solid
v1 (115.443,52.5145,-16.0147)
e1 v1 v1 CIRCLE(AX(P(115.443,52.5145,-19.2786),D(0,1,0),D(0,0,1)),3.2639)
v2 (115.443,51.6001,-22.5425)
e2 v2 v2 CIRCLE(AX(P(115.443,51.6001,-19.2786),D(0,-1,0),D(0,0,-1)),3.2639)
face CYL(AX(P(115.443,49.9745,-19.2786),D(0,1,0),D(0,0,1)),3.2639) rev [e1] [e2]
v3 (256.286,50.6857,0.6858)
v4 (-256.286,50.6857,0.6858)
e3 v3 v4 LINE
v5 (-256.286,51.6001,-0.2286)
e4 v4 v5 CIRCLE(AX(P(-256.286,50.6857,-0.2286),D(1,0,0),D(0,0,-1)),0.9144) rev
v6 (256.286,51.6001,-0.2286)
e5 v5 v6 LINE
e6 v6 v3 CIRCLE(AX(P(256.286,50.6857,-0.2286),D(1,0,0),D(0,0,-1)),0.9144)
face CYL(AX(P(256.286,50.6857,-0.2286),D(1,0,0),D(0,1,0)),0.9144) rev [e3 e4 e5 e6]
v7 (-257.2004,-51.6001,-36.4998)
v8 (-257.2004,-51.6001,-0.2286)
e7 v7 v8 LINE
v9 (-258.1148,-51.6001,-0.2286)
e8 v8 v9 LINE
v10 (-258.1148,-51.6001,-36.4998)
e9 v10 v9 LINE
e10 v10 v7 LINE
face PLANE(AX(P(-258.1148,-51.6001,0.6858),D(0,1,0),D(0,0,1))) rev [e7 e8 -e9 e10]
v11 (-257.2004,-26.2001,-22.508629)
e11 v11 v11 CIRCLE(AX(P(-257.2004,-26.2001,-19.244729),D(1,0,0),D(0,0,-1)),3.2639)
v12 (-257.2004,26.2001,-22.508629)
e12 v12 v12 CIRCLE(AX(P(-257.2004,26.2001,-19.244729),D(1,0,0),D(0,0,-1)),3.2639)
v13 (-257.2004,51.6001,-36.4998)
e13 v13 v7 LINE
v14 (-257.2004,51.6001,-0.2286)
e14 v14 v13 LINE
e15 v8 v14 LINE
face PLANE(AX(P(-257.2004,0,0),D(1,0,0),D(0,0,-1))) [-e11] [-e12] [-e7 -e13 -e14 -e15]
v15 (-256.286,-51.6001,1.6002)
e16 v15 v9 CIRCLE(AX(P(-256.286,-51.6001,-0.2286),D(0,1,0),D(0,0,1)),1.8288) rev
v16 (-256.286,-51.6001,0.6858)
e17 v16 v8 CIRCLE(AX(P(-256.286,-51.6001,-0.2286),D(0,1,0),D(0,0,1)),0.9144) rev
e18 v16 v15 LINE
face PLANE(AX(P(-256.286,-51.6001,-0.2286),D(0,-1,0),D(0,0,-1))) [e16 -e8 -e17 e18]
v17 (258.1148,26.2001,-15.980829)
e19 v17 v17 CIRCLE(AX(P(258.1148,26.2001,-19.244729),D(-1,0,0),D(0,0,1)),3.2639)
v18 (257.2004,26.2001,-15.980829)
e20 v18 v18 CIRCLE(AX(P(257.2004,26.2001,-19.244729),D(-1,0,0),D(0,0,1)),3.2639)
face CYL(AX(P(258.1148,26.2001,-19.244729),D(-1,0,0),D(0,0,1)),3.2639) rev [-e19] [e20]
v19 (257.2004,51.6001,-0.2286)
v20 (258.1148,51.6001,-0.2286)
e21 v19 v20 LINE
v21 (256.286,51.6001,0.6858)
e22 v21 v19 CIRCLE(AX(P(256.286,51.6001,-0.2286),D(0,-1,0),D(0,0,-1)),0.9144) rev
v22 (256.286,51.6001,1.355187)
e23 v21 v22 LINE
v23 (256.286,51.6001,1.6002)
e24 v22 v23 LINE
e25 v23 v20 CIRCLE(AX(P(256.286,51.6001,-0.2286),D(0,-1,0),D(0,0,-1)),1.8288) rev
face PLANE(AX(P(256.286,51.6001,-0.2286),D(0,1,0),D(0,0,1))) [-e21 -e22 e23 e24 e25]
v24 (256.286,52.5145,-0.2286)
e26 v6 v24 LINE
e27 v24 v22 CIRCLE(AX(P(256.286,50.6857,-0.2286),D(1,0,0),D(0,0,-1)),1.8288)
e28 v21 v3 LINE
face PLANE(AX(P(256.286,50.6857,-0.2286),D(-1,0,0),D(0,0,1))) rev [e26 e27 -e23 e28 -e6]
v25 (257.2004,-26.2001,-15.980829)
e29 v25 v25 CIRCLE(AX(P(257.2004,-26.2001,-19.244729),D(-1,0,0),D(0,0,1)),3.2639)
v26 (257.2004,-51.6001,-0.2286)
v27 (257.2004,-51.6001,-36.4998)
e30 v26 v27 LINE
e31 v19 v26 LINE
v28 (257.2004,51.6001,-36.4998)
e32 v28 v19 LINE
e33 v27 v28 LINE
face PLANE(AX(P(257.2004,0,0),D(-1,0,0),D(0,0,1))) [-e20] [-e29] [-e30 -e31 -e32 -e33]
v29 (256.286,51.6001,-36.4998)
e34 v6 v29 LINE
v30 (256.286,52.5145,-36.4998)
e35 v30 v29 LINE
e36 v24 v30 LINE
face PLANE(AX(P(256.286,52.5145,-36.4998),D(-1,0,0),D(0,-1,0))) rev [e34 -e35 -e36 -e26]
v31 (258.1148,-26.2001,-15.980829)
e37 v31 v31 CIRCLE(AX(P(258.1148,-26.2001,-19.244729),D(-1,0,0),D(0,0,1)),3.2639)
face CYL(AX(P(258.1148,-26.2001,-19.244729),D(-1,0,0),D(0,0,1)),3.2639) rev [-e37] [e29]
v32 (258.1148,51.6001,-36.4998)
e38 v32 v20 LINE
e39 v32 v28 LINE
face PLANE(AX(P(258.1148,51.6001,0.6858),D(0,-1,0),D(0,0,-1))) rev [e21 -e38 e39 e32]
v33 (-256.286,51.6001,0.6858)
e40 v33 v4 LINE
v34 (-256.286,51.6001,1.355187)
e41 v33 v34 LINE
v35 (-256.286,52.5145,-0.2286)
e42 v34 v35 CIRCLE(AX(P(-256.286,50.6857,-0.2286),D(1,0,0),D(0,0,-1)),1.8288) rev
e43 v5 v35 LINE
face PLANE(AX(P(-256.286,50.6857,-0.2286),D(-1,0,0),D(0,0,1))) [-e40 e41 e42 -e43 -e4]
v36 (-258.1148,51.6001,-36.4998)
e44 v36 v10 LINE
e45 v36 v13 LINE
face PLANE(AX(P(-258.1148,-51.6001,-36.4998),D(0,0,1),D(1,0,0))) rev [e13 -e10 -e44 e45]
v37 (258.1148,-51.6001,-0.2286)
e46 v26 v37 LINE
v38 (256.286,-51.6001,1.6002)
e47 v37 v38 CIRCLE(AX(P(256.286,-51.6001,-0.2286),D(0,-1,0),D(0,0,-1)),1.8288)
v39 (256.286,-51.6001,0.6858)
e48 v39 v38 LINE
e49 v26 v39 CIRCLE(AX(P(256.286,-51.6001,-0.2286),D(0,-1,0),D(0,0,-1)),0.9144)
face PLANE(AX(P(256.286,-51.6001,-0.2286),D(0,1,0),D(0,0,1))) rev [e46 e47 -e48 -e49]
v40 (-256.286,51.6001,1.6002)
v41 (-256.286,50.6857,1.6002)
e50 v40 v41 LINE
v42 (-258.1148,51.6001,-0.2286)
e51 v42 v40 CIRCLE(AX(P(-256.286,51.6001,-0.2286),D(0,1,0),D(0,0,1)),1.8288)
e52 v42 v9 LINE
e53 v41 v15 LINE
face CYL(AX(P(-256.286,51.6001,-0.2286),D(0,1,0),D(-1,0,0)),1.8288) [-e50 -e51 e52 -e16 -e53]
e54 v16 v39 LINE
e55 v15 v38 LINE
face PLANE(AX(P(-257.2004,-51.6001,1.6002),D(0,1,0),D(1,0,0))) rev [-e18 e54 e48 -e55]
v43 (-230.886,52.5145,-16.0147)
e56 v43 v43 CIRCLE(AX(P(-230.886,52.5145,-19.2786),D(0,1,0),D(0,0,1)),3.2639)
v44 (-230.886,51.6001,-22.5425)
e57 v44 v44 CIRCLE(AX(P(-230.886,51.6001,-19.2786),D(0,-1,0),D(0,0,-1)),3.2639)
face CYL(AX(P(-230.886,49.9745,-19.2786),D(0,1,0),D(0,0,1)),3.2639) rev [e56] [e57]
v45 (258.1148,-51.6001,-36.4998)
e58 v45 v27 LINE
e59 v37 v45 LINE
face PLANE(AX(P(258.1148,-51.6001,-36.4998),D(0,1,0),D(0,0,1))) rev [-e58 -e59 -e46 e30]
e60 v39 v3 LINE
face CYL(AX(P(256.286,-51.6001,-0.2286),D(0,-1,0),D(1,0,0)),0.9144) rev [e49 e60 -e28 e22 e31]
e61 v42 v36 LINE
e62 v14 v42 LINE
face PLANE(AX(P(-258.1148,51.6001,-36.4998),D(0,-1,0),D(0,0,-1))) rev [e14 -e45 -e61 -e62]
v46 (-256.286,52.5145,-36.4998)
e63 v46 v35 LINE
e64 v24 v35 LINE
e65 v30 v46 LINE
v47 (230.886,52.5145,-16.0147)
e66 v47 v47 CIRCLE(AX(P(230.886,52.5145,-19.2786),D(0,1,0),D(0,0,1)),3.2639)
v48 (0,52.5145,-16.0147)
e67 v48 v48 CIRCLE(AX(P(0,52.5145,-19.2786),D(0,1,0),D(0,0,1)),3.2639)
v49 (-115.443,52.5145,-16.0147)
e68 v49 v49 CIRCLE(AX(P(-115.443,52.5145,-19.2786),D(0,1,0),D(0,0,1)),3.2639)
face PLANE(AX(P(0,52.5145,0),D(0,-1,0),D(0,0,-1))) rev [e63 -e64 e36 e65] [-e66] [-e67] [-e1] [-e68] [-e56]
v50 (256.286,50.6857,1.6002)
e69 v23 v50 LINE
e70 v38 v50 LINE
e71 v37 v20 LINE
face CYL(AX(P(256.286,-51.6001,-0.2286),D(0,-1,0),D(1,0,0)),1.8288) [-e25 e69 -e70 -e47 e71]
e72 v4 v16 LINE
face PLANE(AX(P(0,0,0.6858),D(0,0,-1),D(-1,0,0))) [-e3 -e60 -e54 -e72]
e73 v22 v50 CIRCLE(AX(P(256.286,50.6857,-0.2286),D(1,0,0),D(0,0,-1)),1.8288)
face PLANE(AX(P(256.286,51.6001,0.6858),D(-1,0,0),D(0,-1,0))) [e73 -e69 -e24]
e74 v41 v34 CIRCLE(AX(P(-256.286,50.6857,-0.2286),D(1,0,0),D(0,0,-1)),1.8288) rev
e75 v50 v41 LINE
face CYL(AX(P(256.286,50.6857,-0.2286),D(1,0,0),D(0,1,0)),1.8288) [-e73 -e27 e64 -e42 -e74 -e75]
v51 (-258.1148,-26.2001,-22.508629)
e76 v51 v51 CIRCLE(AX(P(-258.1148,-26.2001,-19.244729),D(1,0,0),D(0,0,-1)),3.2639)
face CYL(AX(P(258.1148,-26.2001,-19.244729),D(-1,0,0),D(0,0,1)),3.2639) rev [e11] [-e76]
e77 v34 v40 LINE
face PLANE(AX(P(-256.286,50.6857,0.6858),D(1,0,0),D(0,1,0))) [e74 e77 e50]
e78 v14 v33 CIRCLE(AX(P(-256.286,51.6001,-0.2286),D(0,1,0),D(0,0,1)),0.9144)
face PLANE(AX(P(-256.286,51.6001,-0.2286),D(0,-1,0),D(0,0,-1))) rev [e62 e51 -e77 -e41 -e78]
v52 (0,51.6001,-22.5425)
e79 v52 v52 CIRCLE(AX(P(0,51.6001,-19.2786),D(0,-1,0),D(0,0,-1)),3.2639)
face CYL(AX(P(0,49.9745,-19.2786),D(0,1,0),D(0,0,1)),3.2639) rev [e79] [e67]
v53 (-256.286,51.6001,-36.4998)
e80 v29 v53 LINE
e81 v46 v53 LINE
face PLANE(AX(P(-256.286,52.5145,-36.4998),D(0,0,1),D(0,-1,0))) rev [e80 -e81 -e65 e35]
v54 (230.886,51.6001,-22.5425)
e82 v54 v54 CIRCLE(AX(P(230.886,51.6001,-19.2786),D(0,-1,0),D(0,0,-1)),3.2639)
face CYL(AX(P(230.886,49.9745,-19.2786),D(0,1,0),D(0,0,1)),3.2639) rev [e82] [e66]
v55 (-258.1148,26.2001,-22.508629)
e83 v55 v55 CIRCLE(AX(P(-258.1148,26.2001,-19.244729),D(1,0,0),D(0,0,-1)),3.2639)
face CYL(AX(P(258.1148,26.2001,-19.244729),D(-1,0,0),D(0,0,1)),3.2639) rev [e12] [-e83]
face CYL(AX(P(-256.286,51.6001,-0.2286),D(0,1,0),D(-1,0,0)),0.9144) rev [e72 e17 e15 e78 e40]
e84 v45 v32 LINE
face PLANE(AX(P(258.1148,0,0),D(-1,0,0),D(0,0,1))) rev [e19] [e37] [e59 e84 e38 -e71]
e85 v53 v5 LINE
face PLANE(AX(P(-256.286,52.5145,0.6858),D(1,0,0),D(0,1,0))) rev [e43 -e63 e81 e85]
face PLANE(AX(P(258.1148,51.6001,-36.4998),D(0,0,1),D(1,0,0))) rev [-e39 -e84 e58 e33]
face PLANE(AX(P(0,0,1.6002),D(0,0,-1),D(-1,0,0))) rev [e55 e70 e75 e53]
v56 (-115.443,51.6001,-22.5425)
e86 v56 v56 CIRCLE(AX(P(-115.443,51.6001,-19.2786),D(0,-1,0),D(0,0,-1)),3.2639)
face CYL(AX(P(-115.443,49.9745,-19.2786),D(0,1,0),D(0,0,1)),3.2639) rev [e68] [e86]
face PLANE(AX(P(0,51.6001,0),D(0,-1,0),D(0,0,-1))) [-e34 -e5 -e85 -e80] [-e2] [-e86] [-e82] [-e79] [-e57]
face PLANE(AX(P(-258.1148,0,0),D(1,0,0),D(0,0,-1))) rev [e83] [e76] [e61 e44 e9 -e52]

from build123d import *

# Parameters (mm, degrees)
SKETCH1_W                    = 514.4008
SKETCH1_H                    = 103.2002
BOSS_EXTRUDE1_DEPTH          = 1.6002
CONVERT_SOLID1_OUTLINE_W     = 514.4008
CONVERT_SOLID1_OUTLINE_H     = 103.2002
CONVERT_SOLID1_DEPTH         = 0.6858
EDGE_FLANGE1_STRIP_W         = 5.4864
EDGE_FLANGE1_STRIP_H         = 0.9144
EDGE_FLANGE1_STRIP_CUT_DEPTH = 103.2002
EDGE_FLANGE1_DEPTH           = 103.2002
EDGE_FLANGE2_STRIP_W         = 5.4864
EDGE_FLANGE2_STRIP_H         = 0.9144
EDGE_FLANGE2_STRIP_CUT_DEPTH = 103.2002
EDGE_FLANGE2_DEPTH           = 103.2002
CUT_EXTRUDE3_DEPTH           = 521.084421643
CUT_EXTRUDE3_DEPTH_BACK      = 521.084421643
SKETCH18_R                   = 3.2639
EDGE_FLANGE3_STRIP_W         = 5.4864
EDGE_FLANGE3_STRIP_H         = 0.9144
EDGE_FLANGE3_STRIP_CUT_DEPTH = 512.572
EDGE_FLANGE3_DEPTH           = 512.572
SKETCH22_R                   = 3.2639
CUT_EXTRUDE4_DEPTH           = 2.54


# Read off the part's stored shape, not the designer's step: Convert-Solid1
# Sheet-metal steps are written as plain solids
with BuildPart() as part:
    # Sketch1 → Boss-Extrude1 (new body)
    with BuildSketch(Plane.XY):
        Rectangle(SKETCH1_W, SKETCH1_H)
    extrude(amount=BOSS_EXTRUDE1_DEPTH)

    # Convert-Solid1 outline → Convert-Solid1 (cut)
    with BuildSketch(Plane.XY):
        Rectangle(CONVERT_SOLID1_OUTLINE_W, CONVERT_SOLID1_OUTLINE_H)
    extrude(amount=CONVERT_SOLID1_DEPTH, mode=Mode.SUBTRACT)

    # Edge-Flange1 strip (across the edge) → Edge-Flange1 strip cut (cut)
    with BuildSketch(Plane(origin=(257.2004, 51.6001, 0.6858), x_dir=(-1, 0, 0), z_dir=(0, -1, 0))):
        with Locations((-1.8288, -0.4572)):
            Rectangle(EDGE_FLANGE1_STRIP_W, EDGE_FLANGE1_STRIP_H)
    extrude(amount=EDGE_FLANGE1_STRIP_CUT_DEPTH, mode=Mode.SUBTRACT)

    # Edge-Flange1 section (across the edge) → Edge-Flange1 (add)
    with BuildSketch(Plane(origin=(257.2004, 51.6001, 0.6858), x_dir=(-1, 0, 0), z_dir=(0, -1, 0))):
        with BuildLine():
            Line((-0.9144, 0.9144), (-0.9144, 37.1856))
            Line((-0.9144, 37.1856), (0, 37.1856))
            Line((0, 37.1856), (0, 0.9144))
            ThreePointArc((0, 0.9144), (0.267821559, 0.267821559), (0.9144, 0))
            Line((0.9144, 0), (0.9144, -0.9144))
            ThreePointArc((0.9144, -0.9144), (-0.378756881, -0.378756881), (-0.9144, 0.9144))
        make_face()
    extrude(amount=EDGE_FLANGE1_DEPTH)

    # Edge-Flange2 strip (across the edge) → Edge-Flange2 strip cut (cut)
    with BuildSketch(Plane(origin=(-257.2004, -51.6001, 0.6858), x_dir=(1, 0, 0), z_dir=(0, 1, 0))):
        with Locations((-1.8288, -0.4572)):
            Rectangle(EDGE_FLANGE2_STRIP_W, EDGE_FLANGE2_STRIP_H)
    extrude(amount=EDGE_FLANGE2_STRIP_CUT_DEPTH, mode=Mode.SUBTRACT)

    # Edge-Flange2 section (across the edge) → Edge-Flange2 (add)
    with BuildSketch(Plane(origin=(-257.2004, -51.6001, 0.6858), x_dir=(1, 0, 0), z_dir=(0, 1, 0))):
        with BuildLine():
            Line((-0.9144, 0.9144), (-0.9144, 37.1856))
            Line((-0.9144, 37.1856), (0, 37.1856))
            Line((0, 37.1856), (0, 0.9144))
            ThreePointArc((0, 0.9144), (0.267821559, 0.267821559), (0.9144, 0))
            Line((0.9144, 0), (0.9144, -0.9144))
            ThreePointArc((0.9144, -0.9144), (-0.378756881, -0.378756881), (-0.9144, 0.9144))
        make_face()
    extrude(amount=EDGE_FLANGE2_DEPTH)

    # Sketch18 → Cut-Extrude3 (cut, two sides: drawn at the far end of the back side and taken through both)
    with BuildSketch(Plane.ZY.offset(258.1148).offset(-CUT_EXTRUDE3_DEPTH_BACK)):
        with Locations(Location((-19.244729261, 26.2001, 0), (0, 0, 180))):
            Circle(SKETCH18_R)
        with Locations(Location((-19.244729261, -26.2001, 0), (0, 0, 180))):
            Circle(SKETCH18_R)
    extrude(amount=CUT_EXTRUDE3_DEPTH + CUT_EXTRUDE3_DEPTH_BACK, mode=Mode.SUBTRACT)

    # Edge-Flange3 strip (across the edge) → Edge-Flange3 strip cut (cut)
    with BuildSketch(Plane(origin=(-256.286, 51.6001, 0.6858), x_dir=(0, -1, 0), z_dir=(1, 0, 0))):
        with Locations((-1.8288, -0.4572)):
            Rectangle(EDGE_FLANGE3_STRIP_W, EDGE_FLANGE3_STRIP_H)
    extrude(amount=EDGE_FLANGE3_STRIP_CUT_DEPTH, mode=Mode.SUBTRACT)

    # Edge-Flange3 section (across the edge) → Edge-Flange3 (add)
    with BuildSketch(Plane(origin=(-256.286, 51.6001, 0.6858), x_dir=(0, -1, 0), z_dir=(1, 0, 0))):
        with BuildLine():
            Line((-0.9144, 0.9144), (-0.9144, 37.1856))
            Line((-0.9144, 37.1856), (0, 37.1856))
            Line((0, 37.1856), (0, 0.9144))
            ThreePointArc((0, 0.9144), (0.267821559, 0.267821559), (0.9144, 0))
            Line((0.9144, 0), (0.9144, -0.9144))
            ThreePointArc((0.9144, -0.9144), (-0.378756881, -0.378756881), (-0.9144, 0.9144))
        make_face()
    extrude(amount=EDGE_FLANGE3_DEPTH)

    # Sketch22 → Cut-Extrude4 (cut)
    with BuildSketch(Plane(origin=(0, 52.5145, 0), x_dir=(1, 0, 0), z_dir=(0, 1, 0))):
        with Locations(Location((230.886, 19.2786, 0), (0, 0, 270))):
            Circle(SKETCH22_R)
        with Locations(Location((115.443, 19.2786, 0), (0, 0, 270))):
            Circle(SKETCH22_R)
        with Locations(Location((0, 19.2786, 0), (0, 0, 270))):
            Circle(SKETCH22_R)
        with Locations(Location((-115.443, 19.2786, 0), (0, 0, 270))):
            Circle(SKETCH22_R)
        with Locations(Location((-230.886, 19.2786, 0), (0, 0, 270))):
            Circle(SKETCH22_R)
    extrude(amount=-CUT_EXTRUDE4_DEPTH, mode=Mode.SUBTRACT)


solid = part.part
